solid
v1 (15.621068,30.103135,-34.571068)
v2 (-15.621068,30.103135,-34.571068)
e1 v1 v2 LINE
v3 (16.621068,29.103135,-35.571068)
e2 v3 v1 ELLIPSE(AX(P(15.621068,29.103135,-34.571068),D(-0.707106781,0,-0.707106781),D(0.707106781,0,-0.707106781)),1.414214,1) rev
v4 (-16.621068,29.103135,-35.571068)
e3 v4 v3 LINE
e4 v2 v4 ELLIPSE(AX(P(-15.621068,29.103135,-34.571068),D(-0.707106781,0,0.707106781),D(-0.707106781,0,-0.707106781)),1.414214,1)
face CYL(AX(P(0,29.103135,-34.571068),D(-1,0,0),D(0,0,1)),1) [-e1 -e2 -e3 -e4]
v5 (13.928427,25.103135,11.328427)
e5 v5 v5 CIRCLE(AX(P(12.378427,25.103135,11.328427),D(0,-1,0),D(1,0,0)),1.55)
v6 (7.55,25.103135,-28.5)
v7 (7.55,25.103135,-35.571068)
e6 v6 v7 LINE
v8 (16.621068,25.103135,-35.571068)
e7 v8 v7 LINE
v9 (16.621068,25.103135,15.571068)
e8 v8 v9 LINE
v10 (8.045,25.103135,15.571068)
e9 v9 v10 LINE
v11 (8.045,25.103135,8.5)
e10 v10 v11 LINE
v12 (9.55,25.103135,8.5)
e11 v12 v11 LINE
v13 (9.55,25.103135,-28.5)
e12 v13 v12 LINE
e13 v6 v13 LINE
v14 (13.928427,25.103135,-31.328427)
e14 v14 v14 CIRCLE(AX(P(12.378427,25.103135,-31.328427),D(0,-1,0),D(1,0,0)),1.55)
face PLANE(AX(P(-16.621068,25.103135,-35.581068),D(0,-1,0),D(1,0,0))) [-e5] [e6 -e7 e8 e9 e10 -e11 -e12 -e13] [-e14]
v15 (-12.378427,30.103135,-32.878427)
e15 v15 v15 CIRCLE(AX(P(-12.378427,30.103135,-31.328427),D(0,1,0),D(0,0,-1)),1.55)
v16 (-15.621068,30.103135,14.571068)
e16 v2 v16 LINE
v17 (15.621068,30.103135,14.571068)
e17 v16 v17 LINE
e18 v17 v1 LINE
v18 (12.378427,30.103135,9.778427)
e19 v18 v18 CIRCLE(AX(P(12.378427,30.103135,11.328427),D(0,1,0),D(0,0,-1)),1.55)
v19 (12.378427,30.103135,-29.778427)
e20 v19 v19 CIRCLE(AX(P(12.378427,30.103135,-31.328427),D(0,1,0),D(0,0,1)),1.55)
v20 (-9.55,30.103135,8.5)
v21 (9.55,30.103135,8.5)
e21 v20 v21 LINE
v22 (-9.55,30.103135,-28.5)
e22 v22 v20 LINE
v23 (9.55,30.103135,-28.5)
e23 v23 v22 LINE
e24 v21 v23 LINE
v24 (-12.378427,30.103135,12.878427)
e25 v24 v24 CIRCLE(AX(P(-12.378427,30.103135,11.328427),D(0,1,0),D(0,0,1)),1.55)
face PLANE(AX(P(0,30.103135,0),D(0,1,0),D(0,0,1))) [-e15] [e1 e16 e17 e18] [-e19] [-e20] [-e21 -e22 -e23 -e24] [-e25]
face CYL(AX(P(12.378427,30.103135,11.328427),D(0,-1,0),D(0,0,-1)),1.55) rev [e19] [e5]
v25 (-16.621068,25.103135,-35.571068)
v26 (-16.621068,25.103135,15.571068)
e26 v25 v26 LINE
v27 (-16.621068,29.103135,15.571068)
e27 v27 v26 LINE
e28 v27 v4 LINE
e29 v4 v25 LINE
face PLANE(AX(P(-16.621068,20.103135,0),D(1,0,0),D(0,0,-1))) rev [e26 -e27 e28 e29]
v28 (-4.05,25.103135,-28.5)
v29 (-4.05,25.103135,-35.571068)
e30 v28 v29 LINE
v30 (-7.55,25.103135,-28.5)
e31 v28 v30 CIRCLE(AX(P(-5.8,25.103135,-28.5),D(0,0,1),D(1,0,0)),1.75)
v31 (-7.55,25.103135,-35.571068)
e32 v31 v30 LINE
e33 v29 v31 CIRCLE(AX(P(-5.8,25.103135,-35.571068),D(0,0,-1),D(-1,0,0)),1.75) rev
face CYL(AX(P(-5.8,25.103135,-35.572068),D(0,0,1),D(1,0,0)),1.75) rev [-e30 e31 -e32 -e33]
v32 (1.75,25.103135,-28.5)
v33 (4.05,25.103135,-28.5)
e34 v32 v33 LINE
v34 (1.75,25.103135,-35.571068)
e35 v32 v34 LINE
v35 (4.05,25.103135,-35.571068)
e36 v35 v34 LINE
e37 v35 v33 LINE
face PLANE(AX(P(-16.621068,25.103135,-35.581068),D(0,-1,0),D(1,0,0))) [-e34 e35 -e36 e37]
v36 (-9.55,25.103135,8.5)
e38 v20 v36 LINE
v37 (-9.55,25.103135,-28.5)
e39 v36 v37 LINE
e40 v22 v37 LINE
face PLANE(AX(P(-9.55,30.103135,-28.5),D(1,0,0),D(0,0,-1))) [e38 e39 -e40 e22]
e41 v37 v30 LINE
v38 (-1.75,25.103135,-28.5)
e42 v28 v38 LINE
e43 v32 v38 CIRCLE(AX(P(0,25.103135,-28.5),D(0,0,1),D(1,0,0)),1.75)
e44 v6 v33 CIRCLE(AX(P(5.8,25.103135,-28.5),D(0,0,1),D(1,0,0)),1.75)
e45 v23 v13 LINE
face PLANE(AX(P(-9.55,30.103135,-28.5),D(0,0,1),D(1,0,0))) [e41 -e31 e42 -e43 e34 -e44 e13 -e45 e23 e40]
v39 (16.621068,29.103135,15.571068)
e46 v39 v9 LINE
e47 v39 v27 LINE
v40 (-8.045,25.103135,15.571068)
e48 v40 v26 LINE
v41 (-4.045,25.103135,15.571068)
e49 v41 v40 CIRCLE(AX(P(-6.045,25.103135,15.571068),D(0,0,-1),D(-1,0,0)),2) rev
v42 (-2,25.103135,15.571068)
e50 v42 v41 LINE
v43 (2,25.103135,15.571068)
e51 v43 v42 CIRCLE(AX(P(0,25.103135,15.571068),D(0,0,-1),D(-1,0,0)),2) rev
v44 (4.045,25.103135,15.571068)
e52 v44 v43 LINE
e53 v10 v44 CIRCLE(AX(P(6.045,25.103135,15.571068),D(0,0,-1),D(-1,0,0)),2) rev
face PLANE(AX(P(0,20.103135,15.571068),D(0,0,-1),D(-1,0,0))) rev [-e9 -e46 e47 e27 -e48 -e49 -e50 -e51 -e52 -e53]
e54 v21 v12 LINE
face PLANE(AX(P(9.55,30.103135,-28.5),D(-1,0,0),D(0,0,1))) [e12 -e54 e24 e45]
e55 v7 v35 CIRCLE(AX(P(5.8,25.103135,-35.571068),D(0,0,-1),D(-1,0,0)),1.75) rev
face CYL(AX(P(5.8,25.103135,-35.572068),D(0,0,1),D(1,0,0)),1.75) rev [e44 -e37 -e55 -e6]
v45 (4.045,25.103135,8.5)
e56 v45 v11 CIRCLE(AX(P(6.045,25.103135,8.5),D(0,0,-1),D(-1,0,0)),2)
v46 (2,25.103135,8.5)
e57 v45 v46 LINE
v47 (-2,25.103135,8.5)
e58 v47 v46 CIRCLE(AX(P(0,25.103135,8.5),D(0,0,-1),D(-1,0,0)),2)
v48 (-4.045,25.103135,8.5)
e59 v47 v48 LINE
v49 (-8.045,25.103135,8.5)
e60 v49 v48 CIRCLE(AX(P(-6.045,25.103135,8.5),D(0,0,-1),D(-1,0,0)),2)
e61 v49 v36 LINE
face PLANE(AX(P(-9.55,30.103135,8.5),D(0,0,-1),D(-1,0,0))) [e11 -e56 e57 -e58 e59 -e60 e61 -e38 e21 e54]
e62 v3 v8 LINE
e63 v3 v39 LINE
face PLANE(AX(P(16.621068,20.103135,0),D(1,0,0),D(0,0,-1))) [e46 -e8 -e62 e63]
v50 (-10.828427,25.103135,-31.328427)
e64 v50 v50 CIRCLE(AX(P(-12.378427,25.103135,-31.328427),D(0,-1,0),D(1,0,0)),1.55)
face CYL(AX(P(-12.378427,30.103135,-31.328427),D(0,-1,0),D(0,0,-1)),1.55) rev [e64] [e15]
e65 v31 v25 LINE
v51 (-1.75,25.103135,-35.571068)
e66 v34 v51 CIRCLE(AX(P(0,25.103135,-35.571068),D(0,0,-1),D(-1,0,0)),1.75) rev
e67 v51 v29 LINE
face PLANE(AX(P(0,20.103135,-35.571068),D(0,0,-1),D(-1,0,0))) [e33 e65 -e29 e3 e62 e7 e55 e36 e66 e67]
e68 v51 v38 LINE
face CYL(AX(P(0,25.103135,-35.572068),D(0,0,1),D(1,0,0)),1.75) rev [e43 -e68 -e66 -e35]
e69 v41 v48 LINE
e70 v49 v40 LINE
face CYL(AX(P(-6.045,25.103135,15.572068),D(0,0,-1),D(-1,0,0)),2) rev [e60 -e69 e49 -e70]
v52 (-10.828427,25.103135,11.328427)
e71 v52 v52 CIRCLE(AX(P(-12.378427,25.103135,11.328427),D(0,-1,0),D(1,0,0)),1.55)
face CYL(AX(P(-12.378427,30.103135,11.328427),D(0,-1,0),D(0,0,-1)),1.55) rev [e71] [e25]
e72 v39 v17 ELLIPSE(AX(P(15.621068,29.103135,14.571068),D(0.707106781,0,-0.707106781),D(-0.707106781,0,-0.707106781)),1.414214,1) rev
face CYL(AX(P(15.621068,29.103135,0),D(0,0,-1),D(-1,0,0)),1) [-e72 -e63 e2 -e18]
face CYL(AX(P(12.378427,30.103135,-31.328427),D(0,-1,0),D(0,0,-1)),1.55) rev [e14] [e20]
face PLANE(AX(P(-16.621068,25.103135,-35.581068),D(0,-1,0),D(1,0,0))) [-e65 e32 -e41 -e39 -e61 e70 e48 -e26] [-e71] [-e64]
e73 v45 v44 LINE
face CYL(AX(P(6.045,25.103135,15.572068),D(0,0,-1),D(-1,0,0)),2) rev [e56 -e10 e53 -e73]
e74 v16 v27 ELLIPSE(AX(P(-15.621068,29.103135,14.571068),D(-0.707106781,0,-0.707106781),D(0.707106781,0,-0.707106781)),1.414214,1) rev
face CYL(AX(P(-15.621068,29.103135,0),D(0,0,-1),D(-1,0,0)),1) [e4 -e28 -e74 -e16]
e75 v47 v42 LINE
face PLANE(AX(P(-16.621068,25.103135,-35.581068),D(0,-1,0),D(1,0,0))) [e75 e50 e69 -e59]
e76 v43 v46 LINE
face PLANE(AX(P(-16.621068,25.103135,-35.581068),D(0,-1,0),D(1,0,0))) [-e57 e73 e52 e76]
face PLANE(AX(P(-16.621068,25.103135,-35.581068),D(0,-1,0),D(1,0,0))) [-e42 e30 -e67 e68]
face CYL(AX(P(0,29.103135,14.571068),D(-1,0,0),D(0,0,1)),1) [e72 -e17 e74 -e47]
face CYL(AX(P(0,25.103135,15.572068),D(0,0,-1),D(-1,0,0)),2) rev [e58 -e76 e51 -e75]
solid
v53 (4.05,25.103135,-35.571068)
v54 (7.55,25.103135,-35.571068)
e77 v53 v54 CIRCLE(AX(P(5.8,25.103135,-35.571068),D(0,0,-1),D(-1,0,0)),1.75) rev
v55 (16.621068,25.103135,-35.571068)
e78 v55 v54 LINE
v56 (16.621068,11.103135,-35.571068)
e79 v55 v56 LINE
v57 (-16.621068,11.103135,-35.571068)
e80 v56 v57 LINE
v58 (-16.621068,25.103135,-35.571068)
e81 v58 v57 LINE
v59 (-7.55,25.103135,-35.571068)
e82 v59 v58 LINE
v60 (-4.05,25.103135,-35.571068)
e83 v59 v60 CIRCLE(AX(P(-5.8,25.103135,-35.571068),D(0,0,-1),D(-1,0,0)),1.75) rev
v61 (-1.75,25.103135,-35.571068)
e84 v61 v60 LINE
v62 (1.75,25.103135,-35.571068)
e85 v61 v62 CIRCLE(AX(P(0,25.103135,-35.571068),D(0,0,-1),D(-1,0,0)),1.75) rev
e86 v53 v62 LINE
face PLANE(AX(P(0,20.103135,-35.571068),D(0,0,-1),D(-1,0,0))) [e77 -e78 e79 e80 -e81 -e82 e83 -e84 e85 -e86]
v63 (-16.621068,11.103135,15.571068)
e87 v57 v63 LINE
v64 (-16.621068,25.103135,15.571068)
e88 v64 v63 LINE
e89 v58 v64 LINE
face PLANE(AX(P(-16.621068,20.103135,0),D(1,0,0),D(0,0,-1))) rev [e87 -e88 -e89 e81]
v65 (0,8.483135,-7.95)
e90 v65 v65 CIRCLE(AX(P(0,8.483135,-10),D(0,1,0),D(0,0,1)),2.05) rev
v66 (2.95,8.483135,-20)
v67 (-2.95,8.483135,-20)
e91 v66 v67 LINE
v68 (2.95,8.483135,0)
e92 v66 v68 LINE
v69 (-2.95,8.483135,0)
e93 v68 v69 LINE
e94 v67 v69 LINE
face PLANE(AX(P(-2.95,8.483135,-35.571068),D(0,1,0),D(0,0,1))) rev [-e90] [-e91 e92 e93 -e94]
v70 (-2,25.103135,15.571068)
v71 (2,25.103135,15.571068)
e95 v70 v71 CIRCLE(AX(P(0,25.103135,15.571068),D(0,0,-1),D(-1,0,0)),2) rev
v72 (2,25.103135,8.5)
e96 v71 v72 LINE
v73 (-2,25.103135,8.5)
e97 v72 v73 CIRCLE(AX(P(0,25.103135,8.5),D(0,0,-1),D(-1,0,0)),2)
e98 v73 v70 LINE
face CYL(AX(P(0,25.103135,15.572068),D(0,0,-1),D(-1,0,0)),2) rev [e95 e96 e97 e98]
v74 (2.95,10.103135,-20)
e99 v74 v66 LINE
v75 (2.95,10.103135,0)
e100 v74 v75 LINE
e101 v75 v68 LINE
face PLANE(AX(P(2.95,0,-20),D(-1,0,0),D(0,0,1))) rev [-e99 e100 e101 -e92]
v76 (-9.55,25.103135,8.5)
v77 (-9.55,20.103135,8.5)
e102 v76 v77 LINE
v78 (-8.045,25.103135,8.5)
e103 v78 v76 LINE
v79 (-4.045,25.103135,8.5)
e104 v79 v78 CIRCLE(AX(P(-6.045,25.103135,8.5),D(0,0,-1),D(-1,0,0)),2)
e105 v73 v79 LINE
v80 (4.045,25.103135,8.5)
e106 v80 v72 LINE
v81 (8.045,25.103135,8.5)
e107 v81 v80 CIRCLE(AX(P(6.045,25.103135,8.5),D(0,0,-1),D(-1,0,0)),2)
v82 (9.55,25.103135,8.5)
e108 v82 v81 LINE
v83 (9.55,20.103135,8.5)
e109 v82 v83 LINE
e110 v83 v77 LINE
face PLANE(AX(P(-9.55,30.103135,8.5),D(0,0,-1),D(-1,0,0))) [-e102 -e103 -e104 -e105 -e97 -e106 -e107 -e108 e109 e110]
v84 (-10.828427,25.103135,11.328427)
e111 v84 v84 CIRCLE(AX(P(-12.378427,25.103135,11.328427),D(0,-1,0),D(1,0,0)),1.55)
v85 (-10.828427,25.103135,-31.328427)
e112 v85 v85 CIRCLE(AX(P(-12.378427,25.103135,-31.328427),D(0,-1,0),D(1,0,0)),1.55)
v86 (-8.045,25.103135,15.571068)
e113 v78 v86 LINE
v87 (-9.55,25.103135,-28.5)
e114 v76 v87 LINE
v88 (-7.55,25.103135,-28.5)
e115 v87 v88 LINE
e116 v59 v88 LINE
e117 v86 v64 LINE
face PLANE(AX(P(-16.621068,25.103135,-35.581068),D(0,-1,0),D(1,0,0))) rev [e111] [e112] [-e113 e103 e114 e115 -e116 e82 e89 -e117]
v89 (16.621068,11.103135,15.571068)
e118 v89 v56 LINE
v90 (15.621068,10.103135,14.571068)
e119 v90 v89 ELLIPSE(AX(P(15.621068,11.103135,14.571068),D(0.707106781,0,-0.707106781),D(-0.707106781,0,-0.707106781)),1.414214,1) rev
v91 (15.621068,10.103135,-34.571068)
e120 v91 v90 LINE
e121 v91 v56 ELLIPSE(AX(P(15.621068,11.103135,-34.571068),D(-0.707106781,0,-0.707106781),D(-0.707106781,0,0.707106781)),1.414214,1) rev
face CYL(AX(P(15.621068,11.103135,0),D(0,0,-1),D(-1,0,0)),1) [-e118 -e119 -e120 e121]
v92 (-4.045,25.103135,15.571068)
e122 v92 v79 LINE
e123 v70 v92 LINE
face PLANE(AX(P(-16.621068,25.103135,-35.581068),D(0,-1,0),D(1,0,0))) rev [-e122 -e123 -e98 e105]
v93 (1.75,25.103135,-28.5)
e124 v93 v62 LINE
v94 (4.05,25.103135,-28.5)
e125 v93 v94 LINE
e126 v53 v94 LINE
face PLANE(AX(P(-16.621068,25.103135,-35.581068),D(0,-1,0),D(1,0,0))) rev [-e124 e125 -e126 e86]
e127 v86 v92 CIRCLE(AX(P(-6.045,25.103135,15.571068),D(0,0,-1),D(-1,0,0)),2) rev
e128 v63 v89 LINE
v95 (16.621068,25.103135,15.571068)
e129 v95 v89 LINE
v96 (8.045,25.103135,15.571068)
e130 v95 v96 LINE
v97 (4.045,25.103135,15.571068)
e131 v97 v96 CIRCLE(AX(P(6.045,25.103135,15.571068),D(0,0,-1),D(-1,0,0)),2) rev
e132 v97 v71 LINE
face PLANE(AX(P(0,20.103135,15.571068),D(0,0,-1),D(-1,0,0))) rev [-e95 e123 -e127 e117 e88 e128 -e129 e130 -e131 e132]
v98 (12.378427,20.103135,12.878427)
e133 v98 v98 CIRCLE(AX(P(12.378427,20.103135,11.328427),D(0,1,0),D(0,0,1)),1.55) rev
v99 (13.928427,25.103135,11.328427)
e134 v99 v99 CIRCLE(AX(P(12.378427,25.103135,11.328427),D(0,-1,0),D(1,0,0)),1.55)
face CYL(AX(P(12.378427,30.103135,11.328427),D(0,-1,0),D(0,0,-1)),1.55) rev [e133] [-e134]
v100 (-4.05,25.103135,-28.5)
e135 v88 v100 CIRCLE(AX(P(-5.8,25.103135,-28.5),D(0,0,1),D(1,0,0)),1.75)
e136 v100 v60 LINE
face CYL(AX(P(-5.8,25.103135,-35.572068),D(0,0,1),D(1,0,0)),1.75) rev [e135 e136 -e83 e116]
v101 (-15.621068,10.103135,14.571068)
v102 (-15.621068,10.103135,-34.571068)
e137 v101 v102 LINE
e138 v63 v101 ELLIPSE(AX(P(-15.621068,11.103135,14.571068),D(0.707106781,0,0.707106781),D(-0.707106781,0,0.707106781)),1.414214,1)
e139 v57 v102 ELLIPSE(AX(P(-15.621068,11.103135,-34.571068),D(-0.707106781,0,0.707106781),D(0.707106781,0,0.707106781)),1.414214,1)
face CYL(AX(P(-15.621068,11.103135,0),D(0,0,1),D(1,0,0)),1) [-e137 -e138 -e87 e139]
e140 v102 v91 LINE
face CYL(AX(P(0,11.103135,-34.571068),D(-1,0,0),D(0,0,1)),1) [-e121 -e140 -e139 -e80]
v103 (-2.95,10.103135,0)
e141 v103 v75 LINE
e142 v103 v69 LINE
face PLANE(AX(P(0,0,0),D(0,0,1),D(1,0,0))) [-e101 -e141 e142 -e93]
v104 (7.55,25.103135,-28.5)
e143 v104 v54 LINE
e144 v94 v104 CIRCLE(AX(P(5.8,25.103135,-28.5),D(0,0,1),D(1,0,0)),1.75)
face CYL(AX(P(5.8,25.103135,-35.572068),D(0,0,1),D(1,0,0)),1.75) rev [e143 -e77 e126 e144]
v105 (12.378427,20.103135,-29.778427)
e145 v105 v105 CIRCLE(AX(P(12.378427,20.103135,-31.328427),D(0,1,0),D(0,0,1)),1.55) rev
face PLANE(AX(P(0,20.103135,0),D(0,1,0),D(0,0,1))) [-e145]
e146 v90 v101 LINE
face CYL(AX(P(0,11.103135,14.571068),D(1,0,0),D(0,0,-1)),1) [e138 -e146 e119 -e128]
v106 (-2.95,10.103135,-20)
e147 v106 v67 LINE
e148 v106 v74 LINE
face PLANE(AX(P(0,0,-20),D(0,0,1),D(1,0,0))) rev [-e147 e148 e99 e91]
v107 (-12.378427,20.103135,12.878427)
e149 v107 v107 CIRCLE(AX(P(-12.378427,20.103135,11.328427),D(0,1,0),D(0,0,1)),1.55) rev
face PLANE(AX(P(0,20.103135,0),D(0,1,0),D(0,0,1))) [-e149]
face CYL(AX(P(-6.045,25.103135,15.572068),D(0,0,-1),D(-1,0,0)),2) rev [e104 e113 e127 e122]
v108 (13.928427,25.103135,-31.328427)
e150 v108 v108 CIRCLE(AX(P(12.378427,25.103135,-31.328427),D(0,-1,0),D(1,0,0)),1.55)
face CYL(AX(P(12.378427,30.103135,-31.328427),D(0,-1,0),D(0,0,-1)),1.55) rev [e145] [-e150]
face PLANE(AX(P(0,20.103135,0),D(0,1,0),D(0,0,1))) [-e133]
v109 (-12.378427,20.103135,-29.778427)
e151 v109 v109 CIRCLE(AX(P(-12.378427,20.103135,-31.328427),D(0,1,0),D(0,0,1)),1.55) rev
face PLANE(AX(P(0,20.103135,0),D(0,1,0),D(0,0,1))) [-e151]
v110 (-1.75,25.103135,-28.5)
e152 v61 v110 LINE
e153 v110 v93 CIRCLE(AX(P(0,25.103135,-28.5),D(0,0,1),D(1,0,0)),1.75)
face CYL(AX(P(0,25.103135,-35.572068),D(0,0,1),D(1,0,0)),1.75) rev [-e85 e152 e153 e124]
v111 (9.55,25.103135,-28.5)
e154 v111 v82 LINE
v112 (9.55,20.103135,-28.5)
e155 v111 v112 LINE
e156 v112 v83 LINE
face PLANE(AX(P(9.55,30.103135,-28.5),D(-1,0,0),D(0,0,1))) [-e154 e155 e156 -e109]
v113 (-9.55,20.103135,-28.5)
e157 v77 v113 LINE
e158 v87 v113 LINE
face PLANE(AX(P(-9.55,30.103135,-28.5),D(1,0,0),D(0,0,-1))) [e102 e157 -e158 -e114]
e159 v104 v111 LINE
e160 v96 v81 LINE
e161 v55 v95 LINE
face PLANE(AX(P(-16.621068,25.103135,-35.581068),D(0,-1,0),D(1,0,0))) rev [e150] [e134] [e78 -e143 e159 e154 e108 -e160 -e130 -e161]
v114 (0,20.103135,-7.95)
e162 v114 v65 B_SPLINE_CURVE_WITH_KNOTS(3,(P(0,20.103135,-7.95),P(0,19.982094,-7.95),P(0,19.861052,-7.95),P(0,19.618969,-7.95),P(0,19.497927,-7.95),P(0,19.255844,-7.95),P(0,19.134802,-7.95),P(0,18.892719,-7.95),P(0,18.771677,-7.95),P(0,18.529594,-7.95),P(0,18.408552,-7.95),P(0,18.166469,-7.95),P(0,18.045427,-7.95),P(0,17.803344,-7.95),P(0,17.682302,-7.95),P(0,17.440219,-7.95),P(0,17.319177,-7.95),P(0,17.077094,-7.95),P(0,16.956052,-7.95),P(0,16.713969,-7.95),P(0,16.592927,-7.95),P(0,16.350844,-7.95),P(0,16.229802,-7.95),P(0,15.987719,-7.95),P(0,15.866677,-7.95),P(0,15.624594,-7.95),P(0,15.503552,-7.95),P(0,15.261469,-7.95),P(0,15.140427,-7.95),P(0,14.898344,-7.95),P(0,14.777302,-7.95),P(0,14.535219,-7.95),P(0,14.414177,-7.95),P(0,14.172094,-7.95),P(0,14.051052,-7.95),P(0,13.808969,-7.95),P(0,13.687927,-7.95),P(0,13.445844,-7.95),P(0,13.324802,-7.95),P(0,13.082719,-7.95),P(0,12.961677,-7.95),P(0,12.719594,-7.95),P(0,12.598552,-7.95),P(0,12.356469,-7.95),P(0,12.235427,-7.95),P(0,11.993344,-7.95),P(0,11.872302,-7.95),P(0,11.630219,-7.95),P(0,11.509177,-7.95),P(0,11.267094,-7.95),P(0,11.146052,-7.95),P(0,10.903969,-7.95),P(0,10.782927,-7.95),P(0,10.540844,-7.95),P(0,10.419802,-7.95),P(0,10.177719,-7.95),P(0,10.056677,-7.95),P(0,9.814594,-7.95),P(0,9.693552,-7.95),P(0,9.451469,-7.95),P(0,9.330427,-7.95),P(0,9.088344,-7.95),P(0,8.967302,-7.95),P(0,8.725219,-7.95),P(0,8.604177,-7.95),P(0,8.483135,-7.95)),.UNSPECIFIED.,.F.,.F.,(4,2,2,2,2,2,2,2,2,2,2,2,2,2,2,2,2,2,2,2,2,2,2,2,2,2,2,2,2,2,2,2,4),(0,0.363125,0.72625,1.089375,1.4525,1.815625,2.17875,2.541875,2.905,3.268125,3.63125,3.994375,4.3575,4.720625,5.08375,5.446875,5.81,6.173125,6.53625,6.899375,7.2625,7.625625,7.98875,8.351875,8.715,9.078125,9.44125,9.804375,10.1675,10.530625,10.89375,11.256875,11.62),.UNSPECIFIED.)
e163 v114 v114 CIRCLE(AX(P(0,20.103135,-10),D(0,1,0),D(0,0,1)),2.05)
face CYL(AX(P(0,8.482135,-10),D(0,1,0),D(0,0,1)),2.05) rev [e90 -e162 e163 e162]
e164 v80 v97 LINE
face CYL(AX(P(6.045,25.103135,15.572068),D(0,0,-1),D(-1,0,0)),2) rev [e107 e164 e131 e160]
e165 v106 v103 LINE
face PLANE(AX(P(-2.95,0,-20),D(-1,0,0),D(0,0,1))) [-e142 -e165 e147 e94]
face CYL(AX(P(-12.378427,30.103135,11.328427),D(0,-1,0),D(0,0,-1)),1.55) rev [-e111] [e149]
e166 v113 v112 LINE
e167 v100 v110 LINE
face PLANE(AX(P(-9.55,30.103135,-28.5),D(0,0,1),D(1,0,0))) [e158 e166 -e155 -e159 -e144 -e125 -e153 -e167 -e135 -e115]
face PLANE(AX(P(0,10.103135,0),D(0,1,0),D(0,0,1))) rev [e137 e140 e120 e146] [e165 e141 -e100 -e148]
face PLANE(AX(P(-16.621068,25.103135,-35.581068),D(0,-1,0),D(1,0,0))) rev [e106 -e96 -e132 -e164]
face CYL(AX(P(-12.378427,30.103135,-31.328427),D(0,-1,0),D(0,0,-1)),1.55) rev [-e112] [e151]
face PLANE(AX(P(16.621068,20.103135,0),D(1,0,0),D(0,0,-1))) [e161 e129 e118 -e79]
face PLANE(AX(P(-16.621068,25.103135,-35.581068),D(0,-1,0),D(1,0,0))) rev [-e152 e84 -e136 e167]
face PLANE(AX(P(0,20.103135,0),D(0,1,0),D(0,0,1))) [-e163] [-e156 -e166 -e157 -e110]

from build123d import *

# Parameters (mm, degrees)
BOSS_EXTRU_1_DEPTH           = 20
CONG_1_R                     = 0.5
CONG_2_R                     = 1
ESQUISSE3_W                  = 33.24213562373096
ESQUISSE3_H                  = 51.142135623730944
ESQUISSE3_R                  = 1.5499999999999992
ESQUISSE3_R_2                = 1.5499999999999898
ESQUISSE3_W_2                = 19.1
ESQUISSE3_H_2                = 37
BOSS_EXTRU_2_DEPTH           = 10
ESQUISSE3_3_W                = 33.24213562373096
ESQUISSE3_3_H                = 51.142135623730944
ESQUISSE3_3_R                = 1.5499999999999992
ESQUISSE3_3_R_2              = 1.5499999999999898
ESQUISSE3_3_W_2              = 19.1
ESQUISSE3_3_H_2              = 37
BOSS_EXTRU_4_DEPTH           = 20
TROUS_MOTEUR_REACH           = 57.899
ESQUISSE8_R                  = 1.7500000000000038
ESQUISSE8_R_2                = 1.7500000000000027
ENL_V_MAT_EXTRU_1_DEPTH      = 50.47483724416424
TROUS_CABLES_PUISSANCE_REACH = 57.899
ESQUISSE9_R                  = 2
ESQUISSE9_R_2                = 2.000000000000005
ESQUISSE9_R_3                = 2.0000000000000053
ENL_V_MAT_EXTRU_4_REACH      = 42.946
ESQUISSE10_R                 = 2.05
CONG_3_R                     = 1
FRACTIONNER1_SURFACE_1_BACK  = 65.715
FRACTIONNER1_SURFACE_1_DEPTH = 131.43
FRACTIONNER1_SURFACE_2_BACK  = 65.715
FRACTIONNER1_SURFACE_2_DEPTH = 131.43


with BuildPart() as part:
    # Esquisse1 → Boss.-Extru.1 (new body)
    with BuildSketch(Plane.XY):
        Polygon((-1.176e-14, 10.103135382441117), (-2.578e-14, 4.840000000000001), (3.5, 4.840000000000001), (5.71, 6.983135382441116), (5.71, 8.483135382441116), (2.95, 8.483135382441116), (2.95, 10.103135382441117), align=None)
        Polygon((-3.5, 4.840000000000001), (-2.576e-14, 4.840000000000001), (-1.176e-14, 10.103135382441117), (-2.95, 10.103135382441117), (-2.95, 8.483135382441116), (-5.71, 8.483135382441116), (-5.71, 6.983135382441116), align=None)
    extrude(amount=-BOSS_EXTRU_1_DEPTH)

    # Congé1
    cong_1_edges = [part.edges().sort_by_distance(p)[0] for p in [
        (5.71, 7.733135382441116, 0),
        (4.605, 5.911567691220558, 0),
        (0, 4.840000000000001, 0),
        (-4.605, 5.911567691220558, 0),
        (-5.71, 7.733135382441116, 0),
        (-5.71, 7.733135382441116, -20),
        (-4.605, 5.911567691220558, -20),
        (0, 4.840000000000001, -20),
        (4.605, 5.911567691220558, -20),
        (5.71, 7.733135382441116, -20),
    ]]
    fillet(cong_1_edges, radius=CONG_1_R)

    # Congé2
    # the kernel refuses this fillet: 1 mm, written as the material it takes off along each edge
    with BuildSketch(Plane(origin=(4.71, 7.4063748668930085, -20), x_dir=(1, 0, 0), z_dir=(0, 1, 0))) as cong_2_piece_1:
        with BuildLine():
            CenterArc((0.5, -0.5), 0.5, 0, 90)
            Line((1, -0.5), (1, 0))
            Line((1, 0), (0.5, 0))
        make_face()
    revolve(axis=Axis((4.71, 7.4063748668930085, -20), (0, 0, -1)), revolution_arc=45.87999999999987, mode=Mode.SUBTRACT)
    with BuildSketch(Plane(origin=(-4.710000000000001, 7.40637486689301, -20), x_dir=(-0.6961634275566162, -0.717883334625219, 0), z_dir=(0.717883334625219, -0.6961634275566162, 0))) as cong_2_piece_2:
        with BuildLine():
            CenterArc((0.5, -0.5), 0.5, 0, 90)
            Line((1, -0.5), (1, 0))
            Line((1, 0), (0.5, 0))
        make_face()
    revolve(axis=Axis((-4.710000000000001, 7.40637486689301, -20), (0, 0, -1)), revolution_arc=45.87999999999987, mode=Mode.SUBTRACT)
    with BuildSketch(Plane(origin=(4.71, 7.4063748668930085, 0), x_dir=(0.6961634275566162, -0.717883334625219, 0), z_dir=(-0.717883334625219, -0.6961634275566162, 0))) as cong_2_piece_3:
        with BuildLine():
            CenterArc((0.5, -0.5), 0.5, 0, 90)
            Line((1, -0.5), (1, 0))
            Line((1, 0), (0.5, 0))
        make_face()
    revolve(axis=Axis((4.71, 7.4063748668930085, 0), (0, 0, 1)), revolution_arc=45.87999999999987, mode=Mode.SUBTRACT)
    with BuildSketch(Plane(origin=(-4.710000000000001, 7.40637486689301, 0), x_dir=(-1, 0, 0), z_dir=(0, 1, 0))) as cong_2_piece_4:
        with BuildLine():
            CenterArc((0.5, -0.5), 0.5, 0, 90)
            Line((1, -0.5), (1, 0))
            Line((1, 0), (0.5, 0))
        make_face()
    revolve(axis=Axis((-4.710000000000001, 7.40637486689301, 0), (0, 0, 1)), revolution_arc=45.87999999999987, mode=Mode.SUBTRACT)
    with BuildSketch(Plane(origin=(-5.71, 6.983135382441116, 1.1e-16), x_dir=(0.717883334625219, -0.6961634275566161, 0), z_dir=(0, 0, -1))) as cong_2_piece_5:
        with BuildLine():
            CenterArc((CONG_2_R * 0.423239484452, -CONG_2_R), CONG_2_R, 90.00000000000003, 45.879999999999825)
            Line((-CONG_2_R * 0.294643850173, -CONG_2_R * 0.303836572443), (0, 0))
            Line((0, 0), (CONG_2_R * 0.423239484452, 0))
        make_face()
    extrude(amount=20, mode=Mode.SUBTRACT)
    with BuildSketch(Plane(origin=(5.71, 6.983135382441116, 1.1e-16), x_dir=(-0.7178833346252179, -0.6961634275566172, 0), z_dir=(0, 0, -1))) as cong_2_piece_6:
        with BuildLine():
            CenterArc((CONG_2_R * 0.423239484452, CONG_2_R), CONG_2_R, 224.12000000000015, 45.87999999999994)
            Line((-CONG_2_R * 0.294643850173, CONG_2_R * 0.303836572443), (0, 0))
            Line((0, 0), (CONG_2_R * 0.423239484452, 2e-17))
        make_face()
    extrude(amount=20, mode=Mode.SUBTRACT)

    # Esquisse3 → Boss.-Extru.2 (add)
    # profile 1 of 6: a face of its own
    with BuildSketch(Plane(origin=(0, 10.103135382441117, 0), x_dir=(1, 0, 0), z_dir=(0, 1, 0))):
        with Locations((1.78e-15, 9.999999999999996)):
            Rectangle(ESQUISSE3_W, ESQUISSE3_H)
        with Locations((12.37842712474619, -11.328427124746192)):
            Circle(ESQUISSE3_R, mode=Mode.SUBTRACT)
        with Locations((-12.37842712474619, -11.328427124746192)):
            Circle(ESQUISSE3_R, mode=Mode.SUBTRACT)
        with Locations((12.378427124746185, 31.328427124746177)):
            Circle(ESQUISSE3_R_2, mode=Mode.SUBTRACT)
        with Locations((-12.378427124746196, 31.328427124746177)):
            Circle(ESQUISSE3_R_2, mode=Mode.SUBTRACT)
        with Locations((1.78e-15, 10.000000000000004)):
            Rectangle(ESQUISSE3_W_2, ESQUISSE3_H_2, mode=Mode.SUBTRACT)
    # profile 2 of 6: a face of its own
    with BuildSketch(Plane(origin=(0, 10.103135382441117, 0), x_dir=(1, 0, 0), z_dir=(0, 1, 0))):
        with Locations((12.378427124746185, 31.328427124746177)):
            Circle(ESQUISSE3_R_2)
    # profile 3 of 6: a face of its own
    with BuildSketch(Plane(origin=(0, 10.103135382441117, 0), x_dir=(1, 0, 0), z_dir=(0, 1, 0))):
        with Locations((-12.378427124746196, 31.328427124746177)):
            Circle(ESQUISSE3_R_2)
    # profile 4 of 6: a face of its own
    with BuildSketch(Plane(origin=(0, 10.103135382441117, 0), x_dir=(1, 0, 0), z_dir=(0, 1, 0))):
        with Locations((-12.37842712474619, -11.328427124746192)):
            Circle(ESQUISSE3_R)
    # profile 5 of 6: a face of its own
    with BuildSketch(Plane(origin=(0, 10.103135382441117, 0), x_dir=(1, 0, 0), z_dir=(0, 1, 0))):
        with Locations((12.37842712474619, -11.328427124746192)):
            Circle(ESQUISSE3_R)
    # profile 6 of 6: a face of its own
    with BuildSketch(Plane(origin=(0, 10.103135382441117, 0), x_dir=(1, 0, 0), z_dir=(0, 1, 0))):
        Polygon((-9.549999999999999, 28.500000000000004), (-9.549999999999999, -8.499999999999996), (9.550000000000002, -8.499999999999998), (9.550000000000002, 28.500000000000004), align=None)
    extrude(amount=BOSS_EXTRU_2_DEPTH)

    # Esquisse3<3> → Boss.-Extru.4 (add)
    with BuildSketch(Plane(origin=(0, 10.103135382441117, 0), x_dir=(1, 0, 0), z_dir=(0, 1, 0))):
        with Locations((1.78e-15, 9.999999999999996)):
            Rectangle(ESQUISSE3_3_W, ESQUISSE3_3_H)
        with Locations(Location((-12.37842712474619, -11.328427124746192, 0), (0, 0, 270))):
            Circle(ESQUISSE3_3_R, mode=Mode.SUBTRACT)
        with Locations(Location((12.37842712474619, -11.328427124746192, 0), (0, 0, 90))):
            Circle(ESQUISSE3_3_R, mode=Mode.SUBTRACT)
        with Locations(Location((12.378427124746185, 31.328427124746177, 0), (0, 0, 270))):
            Circle(ESQUISSE3_3_R_2, mode=Mode.SUBTRACT)
        with Locations(Location((-12.378427124746196, 31.328427124746177, 0), (0, 0, 90))):
            Circle(ESQUISSE3_3_R_2, mode=Mode.SUBTRACT)
        with Locations((1.78e-15, 10.000000000000004)):
            Rectangle(ESQUISSE3_3_W_2, ESQUISSE3_3_H_2, mode=Mode.SUBTRACT)
    extrude(amount=BOSS_EXTRU_4_DEPTH)

    # Esquisse8 → Trous_moteur (cut, up to next)
    with BuildSketch(Plane.XY.offset(-28.500000000000004), mode=Mode.PRIVATE) as trous_moteur_sk1:
        with Locations((5.800000000000003, 25.10313538244111)):
            Circle(ESQUISSE8_R)
    trous_moteur_tool1 = extrude(trous_moteur_sk1.sketch, amount=-TROUS_MOTEUR_REACH, mode=Mode.PRIVATE) & part.part
    # Esquisse8 → Trous_moteur (cut, up to next)
    with BuildSketch(Plane.XY.offset(-28.500000000000004), mode=Mode.PRIVATE) as trous_moteur_sk2:
        with Locations((3.47e-15, 25.103135382441113)):
            Circle(ESQUISSE8_R_2)
    trous_moteur_tool2 = extrude(trous_moteur_sk2.sketch, amount=-TROUS_MOTEUR_REACH, mode=Mode.PRIVATE) & part.part
    # Esquisse8 → Trous_moteur (cut, up to next)
    with BuildSketch(Plane.XY.offset(-28.500000000000004), mode=Mode.PRIVATE) as trous_moteur_sk3:
        with Locations((-5.799999999999996, 25.103135382441117)):
            Circle(ESQUISSE8_R)
    trous_moteur_tool3 = extrude(trous_moteur_sk3.sketch, amount=-TROUS_MOTEUR_REACH, mode=Mode.PRIVATE) & part.part
    add(trous_moteur_tool1.solids().sort_by_distance((5.8, 25.103135, -28.5))[0], mode=Mode.SUBTRACT)
    add(trous_moteur_tool2.solids().sort_by_distance((0, 25.103135, -28.5))[0], mode=Mode.SUBTRACT)
    add(trous_moteur_tool3.solids().sort_by_distance((-5.8, 25.103135, -28.5))[0], mode=Mode.SUBTRACT)

    # Esquisse5 → Enlèv. mat.-Extru.1 (cut, through all)
    with BuildSketch(Plane.XY):
        with BuildLine():
            Line((-5.209999999999999, 8.483135382441116), (-5.71, 8.483135382441116))
            Line((-5.71, 8.483135382441116), (-5.71, 7.4063748668930085))
            ThreePointArc((-5.71, 7.4063748668930085), (-5.630913521335368, 7.01660790289825), (-5.406163427556616, 6.68849153226779))
            Line((-5.406163427556616, 6.68849153226779), (-3.5, 4.840000000000001))
            Line((-3.5, 4.840000000000001), (3.5, 4.840000000000001))
            Line((3.5, 4.840000000000001), (5.406163427556617, 6.68849153226779))
            ThreePointArc((5.406163427556617, 6.68849153226779), (5.630913521335369, 7.01660790289825), (5.71, 7.406374866893009))
            Line((5.71, 7.406374866893009), (5.71, 8.483135382441116))
            Line((5.71, 8.483135382441116), (5.209999999999999, 8.483135382441116))
            Line((5.209999999999999, 8.483135382441116), (2.95, 8.483135382441116))
            Line((2.95, 8.483135382441116), (-2.95, 8.483135382441116))
            Line((-2.95, 8.483135382441116), (-5.209999999999999, 8.483135382441116))
        make_face()
    extrude(amount=-ENL_V_MAT_EXTRU_1_DEPTH, mode=Mode.SUBTRACT)

    # Esquisse9 → Trous_cables_puissance (cut, up to next)
    with BuildSketch(Plane(origin=(0, 0, 8.499999999999998), x_dir=(-1, 0, 0), z_dir=(0, 0, -1)), mode=Mode.PRIVATE) as trous_cables_puissance_sk1:
        with Locations((6.044999999999998, 25.103135382441117)):
            Circle(ESQUISSE9_R)
    trous_cables_puissance_tool1 = extrude(trous_cables_puissance_sk1.sketch, amount=-TROUS_CABLES_PUISSANCE_REACH, mode=Mode.PRIVATE) & part.part
    # Esquisse9 → Trous_cables_puissance (cut, up to next)
    with BuildSketch(Plane(origin=(0, 0, 8.499999999999998), x_dir=(-1, 0, 0), z_dir=(0, 0, -1)), mode=Mode.PRIVATE) as trous_cables_puissance_sk2:
        with Locations((-6.045000000000002, 25.103135382441117)):
            Circle(ESQUISSE9_R_2)
    trous_cables_puissance_tool2 = extrude(trous_cables_puissance_sk2.sketch, amount=-TROUS_CABLES_PUISSANCE_REACH, mode=Mode.PRIVATE) & part.part
    # Esquisse9 → Trous_cables_puissance (cut, up to next)
    with BuildSketch(Plane(origin=(0, 0, 8.499999999999998), x_dir=(-1, 0, 0), z_dir=(0, 0, -1)), mode=Mode.PRIVATE) as trous_cables_puissance_sk3:
        with Locations((-1.73e-15, 25.103135382441117)):
            Circle(ESQUISSE9_R_3)
    trous_cables_puissance_tool3 = extrude(trous_cables_puissance_sk3.sketch, amount=-TROUS_CABLES_PUISSANCE_REACH, mode=Mode.PRIVATE) & part.part
    add(trous_cables_puissance_tool1.solids().sort_by_distance((-6.045, 25.103135, 8.5))[0], mode=Mode.SUBTRACT)
    add(trous_cables_puissance_tool2.solids().sort_by_distance((6.045, 25.103135, 8.5))[0], mode=Mode.SUBTRACT)
    add(trous_cables_puissance_tool3.solids().sort_by_distance((0, 25.103135, 8.5))[0], mode=Mode.SUBTRACT)

    # Esquisse10 → Enlèv. mat.-Extru.4 (cut, up to next)
    with BuildSketch(Plane(origin=(0, 20.103135382441113, 0), x_dir=(1, 0, 0), z_dir=(0, 1, 0)), mode=Mode.PRIVATE) as enl_v_mat_extru_4_sk1:
        with Locations(Location((1.73e-15, 10.000000000000004, 0), (0, 0, 270))):
            Circle(ESQUISSE10_R)
    enl_v_mat_extru_4_tool1 = extrude(enl_v_mat_extru_4_sk1.sketch, amount=-ENL_V_MAT_EXTRU_4_REACH, mode=Mode.PRIVATE) & part.part
    add(enl_v_mat_extru_4_tool1.solids().sort_by_distance((0, 20.103135, -10))[0], mode=Mode.SUBTRACT)

    # Congé3
    cong_3_edges = [part.edges().sort_by_distance(p)[0] for p in [
        (16.62106781186548, 10.103135382441117, -9.999999999999996),
        (3.55e-15, 10.103135382441117, -35.57106781186547),
        (-16.621067811865476, 10.103135382441117, -9.999999999999996),
        (0, 10.103135382441117, 15.571067811865476),
        (16.62106781186548, 30.103135382441117, -9.999999999999996),
        (3.55e-15, 30.103135382441117, -35.57106781186547),
        (-16.621067811865476, 30.103135382441117, -9.999999999999996),
        (0, 30.103135382441117, 15.571067811865476),
    ]]
    fillet(cong_3_edges, radius=CONG_3_R)


with BuildPart() as body_2:
    # Fractionner1: the piece behind the surface
    add(part.part)
    # Fractionner1 surface: a surface, the sketch's curves swept straight by 131.43 mm
    with BuildLine(Plane.XY.offset(15.571067811865476).offset(-FRACTIONNER1_SURFACE_1_BACK), mode=Mode.PRIVATE) as fractionner1_surface_1_path:
        Line((16.62106781186548, 29.103135382441117), (16.62106781186548, 25.103135382441113))
        Line((16.62106781186548, 25.103135382441113), (-16.62106781186548, 25.10313538244112))
        Line((-16.62106781186548, 25.10313538244112), (-16.621067811865476, 29.103135382441117))
        ThreePointArc((-16.621067811865476, 29.103135382441117), (-16.328174593052022, 29.810242163627663), (-15.621067811865476, 30.103135382441117))
        Line((-15.621067811865476, 30.103135382441117), (15.62106781186548, 30.103135382441117))
        ThreePointArc((15.62106781186548, 30.103135382441117), (16.328174593052026, 29.810242163627663), (16.62106781186548, 29.103135382441117))
    fractionner1_surface_1 = Shell.extrude(fractionner1_surface_1_path.wire(), (0 * FRACTIONNER1_SURFACE_1_DEPTH, 0 * FRACTIONNER1_SURFACE_1_DEPTH, 1 * FRACTIONNER1_SURFACE_1_DEPTH))
    split(bisect_by=fractionner1_surface_1, keep=Keep.BOTTOM)


with BuildPart() as part_1:
    add(part.part)

    # Fractionner1: split by a surface, the side it looks to stays
    # Fractionner1 surface: a surface, the sketch's curves swept straight by 131.43 mm
    with BuildLine(Plane.XY.offset(15.571067811865476).offset(-FRACTIONNER1_SURFACE_2_BACK), mode=Mode.PRIVATE) as fractionner1_surface_2_path:
        Line((16.62106781186548, 29.103135382441117), (16.62106781186548, 25.103135382441113))
        Line((16.62106781186548, 25.103135382441113), (-16.62106781186548, 25.10313538244112))
        Line((-16.62106781186548, 25.10313538244112), (-16.621067811865476, 29.103135382441117))
        ThreePointArc((-16.621067811865476, 29.103135382441117), (-16.328174593052022, 29.810242163627663), (-15.621067811865476, 30.103135382441117))
        Line((-15.621067811865476, 30.103135382441117), (15.62106781186548, 30.103135382441117))
        ThreePointArc((15.62106781186548, 30.103135382441117), (16.328174593052026, 29.810242163627663), (16.62106781186548, 29.103135382441117))
    fractionner1_surface_2 = Shell.extrude(fractionner1_surface_2_path.wire(), (0 * FRACTIONNER1_SURFACE_2_DEPTH, 0 * FRACTIONNER1_SURFACE_2_DEPTH, 1 * FRACTIONNER1_SURFACE_2_DEPTH))
    split(bisect_by=fractionner1_surface_2, keep=Keep.TOP)


solid = Compound([body_2.part, part_1.part])
